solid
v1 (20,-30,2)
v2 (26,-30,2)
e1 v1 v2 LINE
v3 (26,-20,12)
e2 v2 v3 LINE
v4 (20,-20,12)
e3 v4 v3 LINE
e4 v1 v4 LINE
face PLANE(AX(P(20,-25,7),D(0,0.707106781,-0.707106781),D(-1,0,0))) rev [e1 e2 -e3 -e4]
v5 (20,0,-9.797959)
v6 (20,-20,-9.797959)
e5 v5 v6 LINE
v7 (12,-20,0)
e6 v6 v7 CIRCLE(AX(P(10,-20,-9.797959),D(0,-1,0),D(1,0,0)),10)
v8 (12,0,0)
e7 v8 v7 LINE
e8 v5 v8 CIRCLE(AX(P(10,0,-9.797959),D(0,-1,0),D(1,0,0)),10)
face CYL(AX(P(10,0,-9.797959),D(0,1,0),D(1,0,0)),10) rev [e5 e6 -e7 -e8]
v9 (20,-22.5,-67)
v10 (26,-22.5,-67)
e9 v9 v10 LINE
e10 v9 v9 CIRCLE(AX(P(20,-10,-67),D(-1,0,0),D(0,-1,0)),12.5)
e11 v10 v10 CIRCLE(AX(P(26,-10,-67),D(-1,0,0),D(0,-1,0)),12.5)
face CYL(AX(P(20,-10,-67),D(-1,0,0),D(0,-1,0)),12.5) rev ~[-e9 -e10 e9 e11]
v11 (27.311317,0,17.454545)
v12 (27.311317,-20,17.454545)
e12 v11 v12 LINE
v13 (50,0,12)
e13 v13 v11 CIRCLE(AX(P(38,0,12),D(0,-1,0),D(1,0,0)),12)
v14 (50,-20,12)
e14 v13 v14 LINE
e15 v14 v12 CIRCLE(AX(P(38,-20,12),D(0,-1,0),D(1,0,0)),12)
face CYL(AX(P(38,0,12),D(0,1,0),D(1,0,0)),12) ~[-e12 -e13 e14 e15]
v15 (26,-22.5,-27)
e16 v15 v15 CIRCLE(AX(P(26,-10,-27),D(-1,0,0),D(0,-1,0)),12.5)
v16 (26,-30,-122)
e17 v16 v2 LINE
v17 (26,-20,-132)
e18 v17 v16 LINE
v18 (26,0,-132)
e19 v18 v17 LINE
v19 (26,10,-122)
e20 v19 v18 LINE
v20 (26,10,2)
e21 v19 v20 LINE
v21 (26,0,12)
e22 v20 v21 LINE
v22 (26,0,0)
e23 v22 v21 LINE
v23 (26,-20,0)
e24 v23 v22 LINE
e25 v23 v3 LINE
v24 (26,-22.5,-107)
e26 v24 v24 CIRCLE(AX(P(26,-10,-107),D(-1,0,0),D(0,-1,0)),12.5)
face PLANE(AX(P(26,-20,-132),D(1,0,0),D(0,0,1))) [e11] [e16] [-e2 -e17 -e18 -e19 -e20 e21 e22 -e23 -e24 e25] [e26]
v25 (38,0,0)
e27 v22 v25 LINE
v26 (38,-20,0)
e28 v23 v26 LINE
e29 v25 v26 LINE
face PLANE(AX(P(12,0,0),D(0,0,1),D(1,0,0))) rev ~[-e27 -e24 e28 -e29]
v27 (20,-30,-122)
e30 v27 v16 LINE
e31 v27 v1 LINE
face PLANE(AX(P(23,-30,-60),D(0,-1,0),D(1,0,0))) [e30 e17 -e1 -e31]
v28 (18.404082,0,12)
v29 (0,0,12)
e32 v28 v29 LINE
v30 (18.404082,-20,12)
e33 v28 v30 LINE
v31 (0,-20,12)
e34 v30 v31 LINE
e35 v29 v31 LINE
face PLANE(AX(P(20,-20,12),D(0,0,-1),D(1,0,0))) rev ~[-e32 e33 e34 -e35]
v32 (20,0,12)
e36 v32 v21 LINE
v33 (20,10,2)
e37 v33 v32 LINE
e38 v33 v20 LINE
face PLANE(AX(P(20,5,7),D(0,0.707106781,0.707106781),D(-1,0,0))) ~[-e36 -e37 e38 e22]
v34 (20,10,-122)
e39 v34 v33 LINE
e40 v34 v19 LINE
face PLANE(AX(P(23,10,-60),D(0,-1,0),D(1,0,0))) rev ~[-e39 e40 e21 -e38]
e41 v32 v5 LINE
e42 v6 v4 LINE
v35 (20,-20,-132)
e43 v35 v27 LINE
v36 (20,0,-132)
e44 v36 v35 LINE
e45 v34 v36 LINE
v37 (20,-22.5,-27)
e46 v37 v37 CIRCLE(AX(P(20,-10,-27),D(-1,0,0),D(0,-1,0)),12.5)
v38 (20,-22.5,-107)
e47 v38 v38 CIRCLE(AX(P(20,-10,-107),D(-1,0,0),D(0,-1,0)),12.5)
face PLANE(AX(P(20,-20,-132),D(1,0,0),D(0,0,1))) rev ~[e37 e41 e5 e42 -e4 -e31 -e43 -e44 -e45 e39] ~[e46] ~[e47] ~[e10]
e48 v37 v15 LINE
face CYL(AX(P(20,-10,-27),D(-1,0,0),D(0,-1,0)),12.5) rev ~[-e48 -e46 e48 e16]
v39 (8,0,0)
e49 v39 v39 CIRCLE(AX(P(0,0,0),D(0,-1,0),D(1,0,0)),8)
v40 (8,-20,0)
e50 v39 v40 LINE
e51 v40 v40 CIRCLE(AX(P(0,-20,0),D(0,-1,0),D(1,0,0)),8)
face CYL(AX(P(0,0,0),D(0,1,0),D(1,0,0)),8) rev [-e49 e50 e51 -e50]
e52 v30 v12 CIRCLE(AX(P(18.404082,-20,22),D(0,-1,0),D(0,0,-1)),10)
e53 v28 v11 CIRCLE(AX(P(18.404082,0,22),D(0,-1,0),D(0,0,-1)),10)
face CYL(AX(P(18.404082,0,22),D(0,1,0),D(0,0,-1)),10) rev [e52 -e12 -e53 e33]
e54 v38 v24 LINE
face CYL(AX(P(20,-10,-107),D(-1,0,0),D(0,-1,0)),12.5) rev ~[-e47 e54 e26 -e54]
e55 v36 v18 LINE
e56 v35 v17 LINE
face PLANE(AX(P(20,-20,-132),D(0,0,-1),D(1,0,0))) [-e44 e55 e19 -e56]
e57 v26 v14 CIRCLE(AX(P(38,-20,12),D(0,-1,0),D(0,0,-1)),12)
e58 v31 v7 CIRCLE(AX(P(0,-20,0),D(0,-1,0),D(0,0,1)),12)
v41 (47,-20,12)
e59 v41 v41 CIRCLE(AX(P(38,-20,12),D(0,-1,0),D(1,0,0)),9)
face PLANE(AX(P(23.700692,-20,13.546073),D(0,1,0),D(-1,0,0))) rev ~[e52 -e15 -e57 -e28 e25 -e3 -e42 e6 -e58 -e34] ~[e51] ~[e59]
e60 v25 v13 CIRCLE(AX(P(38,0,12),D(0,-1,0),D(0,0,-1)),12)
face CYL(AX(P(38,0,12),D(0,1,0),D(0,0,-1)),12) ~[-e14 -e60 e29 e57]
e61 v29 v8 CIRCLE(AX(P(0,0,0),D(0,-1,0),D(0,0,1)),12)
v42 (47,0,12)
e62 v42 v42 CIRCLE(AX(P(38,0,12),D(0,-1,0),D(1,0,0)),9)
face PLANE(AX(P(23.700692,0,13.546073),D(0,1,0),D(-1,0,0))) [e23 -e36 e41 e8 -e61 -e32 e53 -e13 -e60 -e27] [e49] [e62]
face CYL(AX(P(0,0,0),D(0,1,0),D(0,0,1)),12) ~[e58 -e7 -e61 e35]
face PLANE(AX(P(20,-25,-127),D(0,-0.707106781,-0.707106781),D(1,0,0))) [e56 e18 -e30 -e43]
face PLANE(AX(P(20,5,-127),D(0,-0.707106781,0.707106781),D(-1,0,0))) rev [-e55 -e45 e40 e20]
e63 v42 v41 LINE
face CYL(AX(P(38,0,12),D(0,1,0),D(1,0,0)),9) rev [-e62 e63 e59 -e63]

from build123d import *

# Parameters (mm, degrees)
F0_R          = 8
F0_R_2        = 9
F1_DEPTH      = 20
F2_W          = 6
F2_H          = 144
F3_DEPTH      = 10
F3_DEPTH_BACK = 30
F4_SIZE       = 10
F5_T1_DEPTH   = 20
F6_R          = 12.5
F7_DEPTH      = 6


# Not quite as in the source:
# - a fillet or chamfer that OpenCascade refuses, or shapes differently, is made with other operations: its cross-section is extruded or revolved along the edge and cut away or added


with BuildPart() as f1:
    # F0 (on Front) → F1 (new body)
    with BuildSketch(Plane.XZ):
        with BuildLine():
            ThreePointArc((0, 12), (-8.4852813742, -8.4852813742), (12, 0))
            ThreePointArc((12, 0), (8.4852813742, 8.4852813742), (0, 12))
        make_face()
        Circle(F0_R, mode=Mode.SUBTRACT)
        with BuildLine():
            ThreePointArc((0, 12), (8.4852813742, 8.4852813742), (12, 0))
            Line((12, 0), (38, 0))
            ThreePointArc((38, 0), (29.5147186258, 3.5147186258), (26, 12))
            Line((26, 12), (0, 12))
        make_face()
        with BuildLine():
            ThreePointArc((26, 12), (29.5147186258, 3.5147186258), (38, 0))
            ThreePointArc((38, 0), (46.4852813742, 3.5147186258), (50, 12))
            ThreePointArc((50, 12), (38, 24), (26, 12))
        make_face()
        with Locations((38, 12)):
            Circle(F0_R_2, mode=Mode.SUBTRACT)
    extrude(amount=F1_DEPTH)

    # F2 (on face) → F3 (join, two sides)
    with BuildSketch(Plane.XZ.offset(20)) as f3_sk:
        with Locations((23, -60)):
            Rectangle(F2_W, F2_H)
    extrude(amount=F3_DEPTH)
    extrude(f3_sk.sketch, amount=-F3_DEPTH_BACK)

    # F4
    f4_edges = [f1.edges().sort_by_distance(p)[0] for p in [
        (23, -30, 12),
        (23, 10, 12),
        (23, -30, -132),
        (23, 10, -132),
    ]]
    chamfer(f4_edges, length=F4_SIZE)

    # F5: fillet of radius 10 on 2 edges, made by hand

    # F5_s2 → F5_t1 (join)
    with BuildSketch(Plane.XZ):
        with BuildLine():
            ThreePointArc((18.4040820577, 12), (23.6264117364, 13.4719713458), (27.311317486, 17.4545454545))
            ThreePointArc((27.311317486, 17.4545454545), (26.3324340549, 14.8049785946), (26, 12))
            Line((26, 12), (18.4040820577, 12))
        make_face()
        with BuildLine():
            ThreePointArc((20, -9.7979589711), (17.7459666924, -3.4734036508), (12, 0))
            Line((12, 0), (20, 0))
            Line((20, 0), (20, -9.7979589711))
        make_face()
    extrude(amount=F5_T1_DEPTH)

    # F6 (on face) → F7 (cut, through all)
    with BuildSketch(Plane(origin=(20, 0, 0), x_dir=(0, -1, 0), z_dir=(-1, 0, 0))):
        with Locations((10, -107)):
            Circle(F6_R)
        with Locations((10, -67)):
            Circle(F6_R)
        with Locations((10, -27)):
            Circle(F6_R)
    extrude(amount=-F7_DEPTH, mode=Mode.SUBTRACT)


solid = f1.part
